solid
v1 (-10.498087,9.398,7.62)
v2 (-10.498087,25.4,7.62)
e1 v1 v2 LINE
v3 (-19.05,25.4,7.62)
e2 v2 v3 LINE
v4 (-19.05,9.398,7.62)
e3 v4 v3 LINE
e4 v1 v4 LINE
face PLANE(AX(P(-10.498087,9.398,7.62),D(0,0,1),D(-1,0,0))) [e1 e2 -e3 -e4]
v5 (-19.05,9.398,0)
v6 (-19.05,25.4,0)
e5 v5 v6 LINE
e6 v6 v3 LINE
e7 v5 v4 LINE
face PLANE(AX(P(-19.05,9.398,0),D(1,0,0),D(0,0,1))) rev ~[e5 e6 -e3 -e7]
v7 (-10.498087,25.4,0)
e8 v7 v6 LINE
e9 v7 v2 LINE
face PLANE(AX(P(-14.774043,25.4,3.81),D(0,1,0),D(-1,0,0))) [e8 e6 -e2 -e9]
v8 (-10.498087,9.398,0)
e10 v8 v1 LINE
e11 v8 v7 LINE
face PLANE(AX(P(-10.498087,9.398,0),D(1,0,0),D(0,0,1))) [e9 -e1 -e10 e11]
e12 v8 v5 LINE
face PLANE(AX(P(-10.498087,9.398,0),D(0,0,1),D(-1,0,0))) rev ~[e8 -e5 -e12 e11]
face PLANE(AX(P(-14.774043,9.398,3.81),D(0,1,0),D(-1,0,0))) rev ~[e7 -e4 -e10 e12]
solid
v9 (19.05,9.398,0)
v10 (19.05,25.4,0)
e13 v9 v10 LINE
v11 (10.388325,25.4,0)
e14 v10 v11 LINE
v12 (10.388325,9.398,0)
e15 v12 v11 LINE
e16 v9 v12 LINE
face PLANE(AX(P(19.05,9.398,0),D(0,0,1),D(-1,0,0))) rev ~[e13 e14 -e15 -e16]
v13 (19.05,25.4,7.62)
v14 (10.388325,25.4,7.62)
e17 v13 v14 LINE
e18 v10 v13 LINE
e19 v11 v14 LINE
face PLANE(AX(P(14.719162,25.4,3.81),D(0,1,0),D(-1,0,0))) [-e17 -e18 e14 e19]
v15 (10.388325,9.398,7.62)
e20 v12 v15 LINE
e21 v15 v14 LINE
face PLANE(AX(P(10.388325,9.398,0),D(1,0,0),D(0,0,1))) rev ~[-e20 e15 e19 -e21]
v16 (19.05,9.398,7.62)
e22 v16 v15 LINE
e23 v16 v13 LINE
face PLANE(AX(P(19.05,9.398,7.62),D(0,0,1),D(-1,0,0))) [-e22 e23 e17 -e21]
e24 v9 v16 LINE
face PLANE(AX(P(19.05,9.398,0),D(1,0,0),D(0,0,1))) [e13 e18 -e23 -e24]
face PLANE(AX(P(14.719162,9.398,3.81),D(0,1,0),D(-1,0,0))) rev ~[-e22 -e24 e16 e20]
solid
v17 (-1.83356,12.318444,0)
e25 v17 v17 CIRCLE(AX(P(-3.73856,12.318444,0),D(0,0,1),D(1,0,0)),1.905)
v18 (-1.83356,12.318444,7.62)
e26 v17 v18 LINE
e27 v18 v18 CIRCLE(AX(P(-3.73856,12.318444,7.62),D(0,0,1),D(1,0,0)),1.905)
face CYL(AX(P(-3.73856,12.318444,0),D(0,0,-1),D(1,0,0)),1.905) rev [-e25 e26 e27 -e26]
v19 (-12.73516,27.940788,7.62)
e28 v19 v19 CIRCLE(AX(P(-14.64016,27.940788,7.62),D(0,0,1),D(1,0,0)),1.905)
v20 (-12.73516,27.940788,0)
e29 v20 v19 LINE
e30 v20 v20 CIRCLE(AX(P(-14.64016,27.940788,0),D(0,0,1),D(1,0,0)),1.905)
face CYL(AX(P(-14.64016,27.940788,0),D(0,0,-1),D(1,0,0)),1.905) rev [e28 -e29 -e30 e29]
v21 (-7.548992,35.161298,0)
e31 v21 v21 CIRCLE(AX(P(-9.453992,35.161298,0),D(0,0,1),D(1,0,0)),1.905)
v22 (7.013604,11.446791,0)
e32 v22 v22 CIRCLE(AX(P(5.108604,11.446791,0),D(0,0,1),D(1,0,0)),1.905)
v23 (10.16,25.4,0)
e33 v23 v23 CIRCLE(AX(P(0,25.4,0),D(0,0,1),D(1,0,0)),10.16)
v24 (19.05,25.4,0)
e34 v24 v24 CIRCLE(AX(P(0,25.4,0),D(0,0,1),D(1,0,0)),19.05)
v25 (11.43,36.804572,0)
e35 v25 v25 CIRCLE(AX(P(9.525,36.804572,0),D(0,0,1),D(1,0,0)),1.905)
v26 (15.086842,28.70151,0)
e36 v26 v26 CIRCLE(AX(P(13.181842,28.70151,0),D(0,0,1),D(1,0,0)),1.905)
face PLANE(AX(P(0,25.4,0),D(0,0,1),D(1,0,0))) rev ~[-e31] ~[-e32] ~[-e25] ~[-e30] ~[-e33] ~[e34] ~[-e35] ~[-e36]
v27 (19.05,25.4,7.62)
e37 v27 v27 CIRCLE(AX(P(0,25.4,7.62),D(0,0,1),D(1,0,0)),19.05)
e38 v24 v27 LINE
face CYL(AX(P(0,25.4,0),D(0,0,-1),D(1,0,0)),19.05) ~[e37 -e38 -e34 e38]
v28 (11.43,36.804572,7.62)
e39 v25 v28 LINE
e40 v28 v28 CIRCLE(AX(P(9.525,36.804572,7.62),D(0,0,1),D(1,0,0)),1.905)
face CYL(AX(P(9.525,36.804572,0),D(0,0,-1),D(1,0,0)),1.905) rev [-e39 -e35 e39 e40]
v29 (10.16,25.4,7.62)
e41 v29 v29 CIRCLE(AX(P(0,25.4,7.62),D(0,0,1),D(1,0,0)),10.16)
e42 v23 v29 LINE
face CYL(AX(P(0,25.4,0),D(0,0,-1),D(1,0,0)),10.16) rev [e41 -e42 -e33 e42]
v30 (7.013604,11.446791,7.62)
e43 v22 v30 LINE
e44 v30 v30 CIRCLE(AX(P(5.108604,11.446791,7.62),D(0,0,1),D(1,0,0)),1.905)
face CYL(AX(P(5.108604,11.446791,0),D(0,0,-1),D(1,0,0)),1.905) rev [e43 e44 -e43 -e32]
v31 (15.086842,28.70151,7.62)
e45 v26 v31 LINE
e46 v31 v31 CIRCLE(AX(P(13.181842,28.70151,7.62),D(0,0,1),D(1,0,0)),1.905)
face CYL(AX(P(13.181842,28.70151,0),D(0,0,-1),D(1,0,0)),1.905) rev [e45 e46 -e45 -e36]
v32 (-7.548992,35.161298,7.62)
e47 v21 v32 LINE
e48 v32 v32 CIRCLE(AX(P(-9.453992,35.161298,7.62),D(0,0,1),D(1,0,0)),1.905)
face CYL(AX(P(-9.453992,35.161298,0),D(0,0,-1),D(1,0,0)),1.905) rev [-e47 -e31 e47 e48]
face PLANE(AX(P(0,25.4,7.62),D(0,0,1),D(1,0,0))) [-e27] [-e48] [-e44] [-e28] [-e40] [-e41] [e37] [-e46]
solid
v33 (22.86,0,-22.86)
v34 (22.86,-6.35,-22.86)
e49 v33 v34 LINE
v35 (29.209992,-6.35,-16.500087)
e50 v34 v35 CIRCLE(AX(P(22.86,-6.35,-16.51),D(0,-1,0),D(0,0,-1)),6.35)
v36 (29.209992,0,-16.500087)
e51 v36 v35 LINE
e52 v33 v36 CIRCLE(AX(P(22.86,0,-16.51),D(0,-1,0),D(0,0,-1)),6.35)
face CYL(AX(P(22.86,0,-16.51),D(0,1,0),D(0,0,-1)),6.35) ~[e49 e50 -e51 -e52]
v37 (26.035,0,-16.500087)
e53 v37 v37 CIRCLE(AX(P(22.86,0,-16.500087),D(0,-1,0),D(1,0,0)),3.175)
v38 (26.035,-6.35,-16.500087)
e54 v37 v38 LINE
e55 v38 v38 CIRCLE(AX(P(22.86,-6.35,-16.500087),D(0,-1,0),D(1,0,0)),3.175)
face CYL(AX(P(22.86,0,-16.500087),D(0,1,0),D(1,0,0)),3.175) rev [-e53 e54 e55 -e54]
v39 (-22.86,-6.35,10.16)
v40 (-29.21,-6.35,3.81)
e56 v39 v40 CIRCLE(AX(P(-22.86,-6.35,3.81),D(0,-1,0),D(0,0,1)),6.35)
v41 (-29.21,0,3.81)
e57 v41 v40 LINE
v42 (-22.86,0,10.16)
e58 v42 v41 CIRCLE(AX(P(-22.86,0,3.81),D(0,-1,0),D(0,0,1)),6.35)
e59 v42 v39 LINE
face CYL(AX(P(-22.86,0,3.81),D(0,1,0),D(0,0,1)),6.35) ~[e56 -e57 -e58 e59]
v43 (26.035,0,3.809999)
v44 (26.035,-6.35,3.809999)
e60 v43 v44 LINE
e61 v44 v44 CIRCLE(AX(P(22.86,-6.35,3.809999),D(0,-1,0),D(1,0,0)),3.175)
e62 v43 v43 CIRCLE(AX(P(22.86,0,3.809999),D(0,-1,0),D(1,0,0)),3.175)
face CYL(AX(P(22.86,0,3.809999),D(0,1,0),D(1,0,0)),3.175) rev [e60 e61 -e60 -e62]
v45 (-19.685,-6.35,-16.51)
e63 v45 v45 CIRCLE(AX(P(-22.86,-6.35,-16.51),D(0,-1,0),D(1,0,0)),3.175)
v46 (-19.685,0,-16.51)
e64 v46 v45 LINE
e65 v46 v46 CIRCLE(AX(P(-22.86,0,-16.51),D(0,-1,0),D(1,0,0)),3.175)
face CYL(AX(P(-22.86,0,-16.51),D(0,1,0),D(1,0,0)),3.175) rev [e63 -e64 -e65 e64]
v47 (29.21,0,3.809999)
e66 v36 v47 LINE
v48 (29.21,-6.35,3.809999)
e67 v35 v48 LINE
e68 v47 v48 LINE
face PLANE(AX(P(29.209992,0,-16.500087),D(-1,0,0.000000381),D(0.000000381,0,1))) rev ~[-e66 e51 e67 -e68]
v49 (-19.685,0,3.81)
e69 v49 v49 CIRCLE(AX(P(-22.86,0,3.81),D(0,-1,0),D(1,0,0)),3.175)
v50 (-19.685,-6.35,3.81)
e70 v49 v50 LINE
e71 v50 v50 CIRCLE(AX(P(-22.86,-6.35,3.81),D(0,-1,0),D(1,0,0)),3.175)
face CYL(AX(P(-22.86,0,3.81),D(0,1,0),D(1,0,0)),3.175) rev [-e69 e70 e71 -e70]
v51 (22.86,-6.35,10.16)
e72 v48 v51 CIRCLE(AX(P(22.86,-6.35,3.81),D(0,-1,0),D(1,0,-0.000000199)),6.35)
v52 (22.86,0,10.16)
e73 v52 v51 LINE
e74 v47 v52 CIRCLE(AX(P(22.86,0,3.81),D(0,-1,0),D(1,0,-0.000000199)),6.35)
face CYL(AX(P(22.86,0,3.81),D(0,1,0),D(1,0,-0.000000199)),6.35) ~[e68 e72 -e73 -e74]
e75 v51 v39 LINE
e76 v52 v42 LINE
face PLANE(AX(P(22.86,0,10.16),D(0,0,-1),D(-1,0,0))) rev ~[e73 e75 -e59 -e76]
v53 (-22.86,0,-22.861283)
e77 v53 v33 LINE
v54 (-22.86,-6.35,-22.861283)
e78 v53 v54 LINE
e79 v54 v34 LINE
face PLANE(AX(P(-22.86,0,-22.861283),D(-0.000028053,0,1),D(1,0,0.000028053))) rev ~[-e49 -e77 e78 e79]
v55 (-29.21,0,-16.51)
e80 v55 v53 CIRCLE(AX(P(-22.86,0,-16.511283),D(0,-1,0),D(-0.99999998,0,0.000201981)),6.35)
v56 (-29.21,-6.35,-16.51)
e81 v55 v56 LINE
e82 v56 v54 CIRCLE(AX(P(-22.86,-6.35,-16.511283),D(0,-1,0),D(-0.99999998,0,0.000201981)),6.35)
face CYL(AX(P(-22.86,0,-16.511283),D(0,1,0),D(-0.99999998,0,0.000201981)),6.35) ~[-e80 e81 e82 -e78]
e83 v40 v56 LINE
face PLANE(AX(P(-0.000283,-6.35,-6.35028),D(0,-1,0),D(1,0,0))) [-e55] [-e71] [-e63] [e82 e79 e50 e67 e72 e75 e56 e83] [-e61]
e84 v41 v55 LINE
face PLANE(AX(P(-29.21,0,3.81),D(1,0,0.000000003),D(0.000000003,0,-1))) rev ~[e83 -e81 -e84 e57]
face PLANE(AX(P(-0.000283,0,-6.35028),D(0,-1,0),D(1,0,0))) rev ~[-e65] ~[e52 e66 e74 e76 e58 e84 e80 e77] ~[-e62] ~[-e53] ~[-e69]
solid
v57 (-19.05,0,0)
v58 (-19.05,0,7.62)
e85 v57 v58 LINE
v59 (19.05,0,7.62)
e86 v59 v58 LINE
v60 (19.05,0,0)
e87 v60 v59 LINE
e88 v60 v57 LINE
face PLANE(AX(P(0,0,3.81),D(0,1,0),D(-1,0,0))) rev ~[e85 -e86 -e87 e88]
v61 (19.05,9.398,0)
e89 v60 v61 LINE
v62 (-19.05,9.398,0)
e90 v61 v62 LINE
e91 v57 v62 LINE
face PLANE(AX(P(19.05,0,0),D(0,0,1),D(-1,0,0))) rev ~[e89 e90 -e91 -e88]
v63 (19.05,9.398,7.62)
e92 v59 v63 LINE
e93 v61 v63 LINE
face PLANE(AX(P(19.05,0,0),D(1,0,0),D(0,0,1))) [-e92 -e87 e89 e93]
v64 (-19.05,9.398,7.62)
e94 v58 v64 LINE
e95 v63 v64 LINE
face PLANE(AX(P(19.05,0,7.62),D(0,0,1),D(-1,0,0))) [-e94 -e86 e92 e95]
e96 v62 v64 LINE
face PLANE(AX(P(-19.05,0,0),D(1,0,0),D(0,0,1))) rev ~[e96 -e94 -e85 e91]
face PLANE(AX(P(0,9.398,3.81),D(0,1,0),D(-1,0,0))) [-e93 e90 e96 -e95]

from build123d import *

# Parameters (mm, degrees)
F0_R     = 19.05
F0_R_2   = 1.905
F0_R_3   = 10.16
F1_DEPTH = 7.62
F2_R     = 3.175
F3_DEPTH = 6.35
F4_W     = 38.1
F4_H     = 7.62
F5_DEPTH = 9.398
F6_W     = 8.5519130781
F6_H     = 7.62
F7_DEPTH = 16.002
F6_W_2   = 8.6616750315


# Not quite as in the source:
# - a feature names something its author has since deleted; it is built from what else it names


with BuildPart() as f1:
    # F0 (on Top) → F1 (new body)
    with BuildSketch(Plane.XY):
        with Locations((0, 25.4)):
            Circle(F0_R)
        with Locations((-3.7385604232, 12.3184441793)):
            Circle(F0_R_2, mode=Mode.SUBTRACT)
        with Locations((5.1086041234, 11.4467908741)):
            Circle(F0_R_2, mode=Mode.SUBTRACT)
        with Locations((-14.6401597077, 27.9407882108)):
            Circle(F0_R_2, mode=Mode.SUBTRACT)
        with Locations((-9.4539924163, 35.1612984993)):
            Circle(F0_R_2, mode=Mode.SUBTRACT)
        with Locations((0, 25.4)):
            Circle(F0_R_3, mode=Mode.SUBTRACT)
        with Locations((13.1818417669, 28.7015100533)):
            Circle(F0_R_2, mode=Mode.SUBTRACT)
        with Locations((9.525, 36.8045717149)):
            Circle(F0_R_2, mode=Mode.SUBTRACT)
    extrude(amount=F1_DEPTH)


with BuildPart() as f3:
    # F2 (on Front) → F3 (new body)
    with BuildSketch(Plane.XZ):
        with BuildLine():
            Line((29.2099922622, -16.5000868889), (29.21, 3.8099987387))
            ThreePointArc((29.21, 3.8099987387), (27.3501285065, 8.3001276146), (22.86, 10.16))
            Line((22.86, 10.16), (-22.86, 10.16))
            ThreePointArc((-22.86, 10.16), (-27.3501280662, 8.3001280549), (-29.21, 3.8099999839))
            Line((-29.21, 3.8099999839), (-29.2099999486, -16.51))
            ThreePointArc((-29.2099999486, -16.51), (-27.3505815493, -21.0009571859), (-22.86, -22.8612825818))
            Line((-22.86, -22.8612825818), (22.86, -22.86))
            ThreePointArc((22.86, -22.86), (27.3536315078, -20.9966218776), (29.2099922622, -16.5000868889))
        make_face()
        with Locations((-22.86, -16.51)):
            Circle(F2_R, mode=Mode.SUBTRACT)
        with Locations((22.86, -16.5000868889)):
            Circle(F2_R, mode=Mode.SUBTRACT)
        with Locations((-22.86, 3.81)):
            Circle(F2_R, mode=Mode.SUBTRACT)
        with Locations((22.86, 3.8099987387)):
            Circle(F2_R, mode=Mode.SUBTRACT)
    extrude(amount=F3_DEPTH)


with BuildPart() as f5:
    # F4 (on face) → F5 (new body)
    with BuildSketch(Plane(origin=(0, 0, 0), x_dir=(-1, 0, 0), z_dir=(0, 1, 0))):
        with Locations((0, 3.81)):
            Rectangle(F4_W, F4_H)
    extrude(amount=F5_DEPTH)


with BuildPart() as f7:
    # F6 (on face) → F7 (new body)
    with BuildSketch(Plane(origin=(0, 9.398, 0), x_dir=(-1, 0, 0), z_dir=(0, 1, 0))):
        with Locations((14.7740434609, 3.81)):
            Rectangle(F6_W, F6_H)
    extrude(amount=F7_DEPTH)


with BuildPart() as f7b:
    # F6 (on face) → F7, piece 2 (new body)
    with BuildSketch(Plane(origin=(0, 9.398, 0), x_dir=(-1, 0, 0), z_dir=(0, 1, 0))):
        with Locations((-14.7191624843, 3.81)):
            Rectangle(F6_W_2, F6_H)
    extrude(amount=F7_DEPTH)


solid = Compound([f1.part, f3.part, f5.part, f7.part, f7b.part])
